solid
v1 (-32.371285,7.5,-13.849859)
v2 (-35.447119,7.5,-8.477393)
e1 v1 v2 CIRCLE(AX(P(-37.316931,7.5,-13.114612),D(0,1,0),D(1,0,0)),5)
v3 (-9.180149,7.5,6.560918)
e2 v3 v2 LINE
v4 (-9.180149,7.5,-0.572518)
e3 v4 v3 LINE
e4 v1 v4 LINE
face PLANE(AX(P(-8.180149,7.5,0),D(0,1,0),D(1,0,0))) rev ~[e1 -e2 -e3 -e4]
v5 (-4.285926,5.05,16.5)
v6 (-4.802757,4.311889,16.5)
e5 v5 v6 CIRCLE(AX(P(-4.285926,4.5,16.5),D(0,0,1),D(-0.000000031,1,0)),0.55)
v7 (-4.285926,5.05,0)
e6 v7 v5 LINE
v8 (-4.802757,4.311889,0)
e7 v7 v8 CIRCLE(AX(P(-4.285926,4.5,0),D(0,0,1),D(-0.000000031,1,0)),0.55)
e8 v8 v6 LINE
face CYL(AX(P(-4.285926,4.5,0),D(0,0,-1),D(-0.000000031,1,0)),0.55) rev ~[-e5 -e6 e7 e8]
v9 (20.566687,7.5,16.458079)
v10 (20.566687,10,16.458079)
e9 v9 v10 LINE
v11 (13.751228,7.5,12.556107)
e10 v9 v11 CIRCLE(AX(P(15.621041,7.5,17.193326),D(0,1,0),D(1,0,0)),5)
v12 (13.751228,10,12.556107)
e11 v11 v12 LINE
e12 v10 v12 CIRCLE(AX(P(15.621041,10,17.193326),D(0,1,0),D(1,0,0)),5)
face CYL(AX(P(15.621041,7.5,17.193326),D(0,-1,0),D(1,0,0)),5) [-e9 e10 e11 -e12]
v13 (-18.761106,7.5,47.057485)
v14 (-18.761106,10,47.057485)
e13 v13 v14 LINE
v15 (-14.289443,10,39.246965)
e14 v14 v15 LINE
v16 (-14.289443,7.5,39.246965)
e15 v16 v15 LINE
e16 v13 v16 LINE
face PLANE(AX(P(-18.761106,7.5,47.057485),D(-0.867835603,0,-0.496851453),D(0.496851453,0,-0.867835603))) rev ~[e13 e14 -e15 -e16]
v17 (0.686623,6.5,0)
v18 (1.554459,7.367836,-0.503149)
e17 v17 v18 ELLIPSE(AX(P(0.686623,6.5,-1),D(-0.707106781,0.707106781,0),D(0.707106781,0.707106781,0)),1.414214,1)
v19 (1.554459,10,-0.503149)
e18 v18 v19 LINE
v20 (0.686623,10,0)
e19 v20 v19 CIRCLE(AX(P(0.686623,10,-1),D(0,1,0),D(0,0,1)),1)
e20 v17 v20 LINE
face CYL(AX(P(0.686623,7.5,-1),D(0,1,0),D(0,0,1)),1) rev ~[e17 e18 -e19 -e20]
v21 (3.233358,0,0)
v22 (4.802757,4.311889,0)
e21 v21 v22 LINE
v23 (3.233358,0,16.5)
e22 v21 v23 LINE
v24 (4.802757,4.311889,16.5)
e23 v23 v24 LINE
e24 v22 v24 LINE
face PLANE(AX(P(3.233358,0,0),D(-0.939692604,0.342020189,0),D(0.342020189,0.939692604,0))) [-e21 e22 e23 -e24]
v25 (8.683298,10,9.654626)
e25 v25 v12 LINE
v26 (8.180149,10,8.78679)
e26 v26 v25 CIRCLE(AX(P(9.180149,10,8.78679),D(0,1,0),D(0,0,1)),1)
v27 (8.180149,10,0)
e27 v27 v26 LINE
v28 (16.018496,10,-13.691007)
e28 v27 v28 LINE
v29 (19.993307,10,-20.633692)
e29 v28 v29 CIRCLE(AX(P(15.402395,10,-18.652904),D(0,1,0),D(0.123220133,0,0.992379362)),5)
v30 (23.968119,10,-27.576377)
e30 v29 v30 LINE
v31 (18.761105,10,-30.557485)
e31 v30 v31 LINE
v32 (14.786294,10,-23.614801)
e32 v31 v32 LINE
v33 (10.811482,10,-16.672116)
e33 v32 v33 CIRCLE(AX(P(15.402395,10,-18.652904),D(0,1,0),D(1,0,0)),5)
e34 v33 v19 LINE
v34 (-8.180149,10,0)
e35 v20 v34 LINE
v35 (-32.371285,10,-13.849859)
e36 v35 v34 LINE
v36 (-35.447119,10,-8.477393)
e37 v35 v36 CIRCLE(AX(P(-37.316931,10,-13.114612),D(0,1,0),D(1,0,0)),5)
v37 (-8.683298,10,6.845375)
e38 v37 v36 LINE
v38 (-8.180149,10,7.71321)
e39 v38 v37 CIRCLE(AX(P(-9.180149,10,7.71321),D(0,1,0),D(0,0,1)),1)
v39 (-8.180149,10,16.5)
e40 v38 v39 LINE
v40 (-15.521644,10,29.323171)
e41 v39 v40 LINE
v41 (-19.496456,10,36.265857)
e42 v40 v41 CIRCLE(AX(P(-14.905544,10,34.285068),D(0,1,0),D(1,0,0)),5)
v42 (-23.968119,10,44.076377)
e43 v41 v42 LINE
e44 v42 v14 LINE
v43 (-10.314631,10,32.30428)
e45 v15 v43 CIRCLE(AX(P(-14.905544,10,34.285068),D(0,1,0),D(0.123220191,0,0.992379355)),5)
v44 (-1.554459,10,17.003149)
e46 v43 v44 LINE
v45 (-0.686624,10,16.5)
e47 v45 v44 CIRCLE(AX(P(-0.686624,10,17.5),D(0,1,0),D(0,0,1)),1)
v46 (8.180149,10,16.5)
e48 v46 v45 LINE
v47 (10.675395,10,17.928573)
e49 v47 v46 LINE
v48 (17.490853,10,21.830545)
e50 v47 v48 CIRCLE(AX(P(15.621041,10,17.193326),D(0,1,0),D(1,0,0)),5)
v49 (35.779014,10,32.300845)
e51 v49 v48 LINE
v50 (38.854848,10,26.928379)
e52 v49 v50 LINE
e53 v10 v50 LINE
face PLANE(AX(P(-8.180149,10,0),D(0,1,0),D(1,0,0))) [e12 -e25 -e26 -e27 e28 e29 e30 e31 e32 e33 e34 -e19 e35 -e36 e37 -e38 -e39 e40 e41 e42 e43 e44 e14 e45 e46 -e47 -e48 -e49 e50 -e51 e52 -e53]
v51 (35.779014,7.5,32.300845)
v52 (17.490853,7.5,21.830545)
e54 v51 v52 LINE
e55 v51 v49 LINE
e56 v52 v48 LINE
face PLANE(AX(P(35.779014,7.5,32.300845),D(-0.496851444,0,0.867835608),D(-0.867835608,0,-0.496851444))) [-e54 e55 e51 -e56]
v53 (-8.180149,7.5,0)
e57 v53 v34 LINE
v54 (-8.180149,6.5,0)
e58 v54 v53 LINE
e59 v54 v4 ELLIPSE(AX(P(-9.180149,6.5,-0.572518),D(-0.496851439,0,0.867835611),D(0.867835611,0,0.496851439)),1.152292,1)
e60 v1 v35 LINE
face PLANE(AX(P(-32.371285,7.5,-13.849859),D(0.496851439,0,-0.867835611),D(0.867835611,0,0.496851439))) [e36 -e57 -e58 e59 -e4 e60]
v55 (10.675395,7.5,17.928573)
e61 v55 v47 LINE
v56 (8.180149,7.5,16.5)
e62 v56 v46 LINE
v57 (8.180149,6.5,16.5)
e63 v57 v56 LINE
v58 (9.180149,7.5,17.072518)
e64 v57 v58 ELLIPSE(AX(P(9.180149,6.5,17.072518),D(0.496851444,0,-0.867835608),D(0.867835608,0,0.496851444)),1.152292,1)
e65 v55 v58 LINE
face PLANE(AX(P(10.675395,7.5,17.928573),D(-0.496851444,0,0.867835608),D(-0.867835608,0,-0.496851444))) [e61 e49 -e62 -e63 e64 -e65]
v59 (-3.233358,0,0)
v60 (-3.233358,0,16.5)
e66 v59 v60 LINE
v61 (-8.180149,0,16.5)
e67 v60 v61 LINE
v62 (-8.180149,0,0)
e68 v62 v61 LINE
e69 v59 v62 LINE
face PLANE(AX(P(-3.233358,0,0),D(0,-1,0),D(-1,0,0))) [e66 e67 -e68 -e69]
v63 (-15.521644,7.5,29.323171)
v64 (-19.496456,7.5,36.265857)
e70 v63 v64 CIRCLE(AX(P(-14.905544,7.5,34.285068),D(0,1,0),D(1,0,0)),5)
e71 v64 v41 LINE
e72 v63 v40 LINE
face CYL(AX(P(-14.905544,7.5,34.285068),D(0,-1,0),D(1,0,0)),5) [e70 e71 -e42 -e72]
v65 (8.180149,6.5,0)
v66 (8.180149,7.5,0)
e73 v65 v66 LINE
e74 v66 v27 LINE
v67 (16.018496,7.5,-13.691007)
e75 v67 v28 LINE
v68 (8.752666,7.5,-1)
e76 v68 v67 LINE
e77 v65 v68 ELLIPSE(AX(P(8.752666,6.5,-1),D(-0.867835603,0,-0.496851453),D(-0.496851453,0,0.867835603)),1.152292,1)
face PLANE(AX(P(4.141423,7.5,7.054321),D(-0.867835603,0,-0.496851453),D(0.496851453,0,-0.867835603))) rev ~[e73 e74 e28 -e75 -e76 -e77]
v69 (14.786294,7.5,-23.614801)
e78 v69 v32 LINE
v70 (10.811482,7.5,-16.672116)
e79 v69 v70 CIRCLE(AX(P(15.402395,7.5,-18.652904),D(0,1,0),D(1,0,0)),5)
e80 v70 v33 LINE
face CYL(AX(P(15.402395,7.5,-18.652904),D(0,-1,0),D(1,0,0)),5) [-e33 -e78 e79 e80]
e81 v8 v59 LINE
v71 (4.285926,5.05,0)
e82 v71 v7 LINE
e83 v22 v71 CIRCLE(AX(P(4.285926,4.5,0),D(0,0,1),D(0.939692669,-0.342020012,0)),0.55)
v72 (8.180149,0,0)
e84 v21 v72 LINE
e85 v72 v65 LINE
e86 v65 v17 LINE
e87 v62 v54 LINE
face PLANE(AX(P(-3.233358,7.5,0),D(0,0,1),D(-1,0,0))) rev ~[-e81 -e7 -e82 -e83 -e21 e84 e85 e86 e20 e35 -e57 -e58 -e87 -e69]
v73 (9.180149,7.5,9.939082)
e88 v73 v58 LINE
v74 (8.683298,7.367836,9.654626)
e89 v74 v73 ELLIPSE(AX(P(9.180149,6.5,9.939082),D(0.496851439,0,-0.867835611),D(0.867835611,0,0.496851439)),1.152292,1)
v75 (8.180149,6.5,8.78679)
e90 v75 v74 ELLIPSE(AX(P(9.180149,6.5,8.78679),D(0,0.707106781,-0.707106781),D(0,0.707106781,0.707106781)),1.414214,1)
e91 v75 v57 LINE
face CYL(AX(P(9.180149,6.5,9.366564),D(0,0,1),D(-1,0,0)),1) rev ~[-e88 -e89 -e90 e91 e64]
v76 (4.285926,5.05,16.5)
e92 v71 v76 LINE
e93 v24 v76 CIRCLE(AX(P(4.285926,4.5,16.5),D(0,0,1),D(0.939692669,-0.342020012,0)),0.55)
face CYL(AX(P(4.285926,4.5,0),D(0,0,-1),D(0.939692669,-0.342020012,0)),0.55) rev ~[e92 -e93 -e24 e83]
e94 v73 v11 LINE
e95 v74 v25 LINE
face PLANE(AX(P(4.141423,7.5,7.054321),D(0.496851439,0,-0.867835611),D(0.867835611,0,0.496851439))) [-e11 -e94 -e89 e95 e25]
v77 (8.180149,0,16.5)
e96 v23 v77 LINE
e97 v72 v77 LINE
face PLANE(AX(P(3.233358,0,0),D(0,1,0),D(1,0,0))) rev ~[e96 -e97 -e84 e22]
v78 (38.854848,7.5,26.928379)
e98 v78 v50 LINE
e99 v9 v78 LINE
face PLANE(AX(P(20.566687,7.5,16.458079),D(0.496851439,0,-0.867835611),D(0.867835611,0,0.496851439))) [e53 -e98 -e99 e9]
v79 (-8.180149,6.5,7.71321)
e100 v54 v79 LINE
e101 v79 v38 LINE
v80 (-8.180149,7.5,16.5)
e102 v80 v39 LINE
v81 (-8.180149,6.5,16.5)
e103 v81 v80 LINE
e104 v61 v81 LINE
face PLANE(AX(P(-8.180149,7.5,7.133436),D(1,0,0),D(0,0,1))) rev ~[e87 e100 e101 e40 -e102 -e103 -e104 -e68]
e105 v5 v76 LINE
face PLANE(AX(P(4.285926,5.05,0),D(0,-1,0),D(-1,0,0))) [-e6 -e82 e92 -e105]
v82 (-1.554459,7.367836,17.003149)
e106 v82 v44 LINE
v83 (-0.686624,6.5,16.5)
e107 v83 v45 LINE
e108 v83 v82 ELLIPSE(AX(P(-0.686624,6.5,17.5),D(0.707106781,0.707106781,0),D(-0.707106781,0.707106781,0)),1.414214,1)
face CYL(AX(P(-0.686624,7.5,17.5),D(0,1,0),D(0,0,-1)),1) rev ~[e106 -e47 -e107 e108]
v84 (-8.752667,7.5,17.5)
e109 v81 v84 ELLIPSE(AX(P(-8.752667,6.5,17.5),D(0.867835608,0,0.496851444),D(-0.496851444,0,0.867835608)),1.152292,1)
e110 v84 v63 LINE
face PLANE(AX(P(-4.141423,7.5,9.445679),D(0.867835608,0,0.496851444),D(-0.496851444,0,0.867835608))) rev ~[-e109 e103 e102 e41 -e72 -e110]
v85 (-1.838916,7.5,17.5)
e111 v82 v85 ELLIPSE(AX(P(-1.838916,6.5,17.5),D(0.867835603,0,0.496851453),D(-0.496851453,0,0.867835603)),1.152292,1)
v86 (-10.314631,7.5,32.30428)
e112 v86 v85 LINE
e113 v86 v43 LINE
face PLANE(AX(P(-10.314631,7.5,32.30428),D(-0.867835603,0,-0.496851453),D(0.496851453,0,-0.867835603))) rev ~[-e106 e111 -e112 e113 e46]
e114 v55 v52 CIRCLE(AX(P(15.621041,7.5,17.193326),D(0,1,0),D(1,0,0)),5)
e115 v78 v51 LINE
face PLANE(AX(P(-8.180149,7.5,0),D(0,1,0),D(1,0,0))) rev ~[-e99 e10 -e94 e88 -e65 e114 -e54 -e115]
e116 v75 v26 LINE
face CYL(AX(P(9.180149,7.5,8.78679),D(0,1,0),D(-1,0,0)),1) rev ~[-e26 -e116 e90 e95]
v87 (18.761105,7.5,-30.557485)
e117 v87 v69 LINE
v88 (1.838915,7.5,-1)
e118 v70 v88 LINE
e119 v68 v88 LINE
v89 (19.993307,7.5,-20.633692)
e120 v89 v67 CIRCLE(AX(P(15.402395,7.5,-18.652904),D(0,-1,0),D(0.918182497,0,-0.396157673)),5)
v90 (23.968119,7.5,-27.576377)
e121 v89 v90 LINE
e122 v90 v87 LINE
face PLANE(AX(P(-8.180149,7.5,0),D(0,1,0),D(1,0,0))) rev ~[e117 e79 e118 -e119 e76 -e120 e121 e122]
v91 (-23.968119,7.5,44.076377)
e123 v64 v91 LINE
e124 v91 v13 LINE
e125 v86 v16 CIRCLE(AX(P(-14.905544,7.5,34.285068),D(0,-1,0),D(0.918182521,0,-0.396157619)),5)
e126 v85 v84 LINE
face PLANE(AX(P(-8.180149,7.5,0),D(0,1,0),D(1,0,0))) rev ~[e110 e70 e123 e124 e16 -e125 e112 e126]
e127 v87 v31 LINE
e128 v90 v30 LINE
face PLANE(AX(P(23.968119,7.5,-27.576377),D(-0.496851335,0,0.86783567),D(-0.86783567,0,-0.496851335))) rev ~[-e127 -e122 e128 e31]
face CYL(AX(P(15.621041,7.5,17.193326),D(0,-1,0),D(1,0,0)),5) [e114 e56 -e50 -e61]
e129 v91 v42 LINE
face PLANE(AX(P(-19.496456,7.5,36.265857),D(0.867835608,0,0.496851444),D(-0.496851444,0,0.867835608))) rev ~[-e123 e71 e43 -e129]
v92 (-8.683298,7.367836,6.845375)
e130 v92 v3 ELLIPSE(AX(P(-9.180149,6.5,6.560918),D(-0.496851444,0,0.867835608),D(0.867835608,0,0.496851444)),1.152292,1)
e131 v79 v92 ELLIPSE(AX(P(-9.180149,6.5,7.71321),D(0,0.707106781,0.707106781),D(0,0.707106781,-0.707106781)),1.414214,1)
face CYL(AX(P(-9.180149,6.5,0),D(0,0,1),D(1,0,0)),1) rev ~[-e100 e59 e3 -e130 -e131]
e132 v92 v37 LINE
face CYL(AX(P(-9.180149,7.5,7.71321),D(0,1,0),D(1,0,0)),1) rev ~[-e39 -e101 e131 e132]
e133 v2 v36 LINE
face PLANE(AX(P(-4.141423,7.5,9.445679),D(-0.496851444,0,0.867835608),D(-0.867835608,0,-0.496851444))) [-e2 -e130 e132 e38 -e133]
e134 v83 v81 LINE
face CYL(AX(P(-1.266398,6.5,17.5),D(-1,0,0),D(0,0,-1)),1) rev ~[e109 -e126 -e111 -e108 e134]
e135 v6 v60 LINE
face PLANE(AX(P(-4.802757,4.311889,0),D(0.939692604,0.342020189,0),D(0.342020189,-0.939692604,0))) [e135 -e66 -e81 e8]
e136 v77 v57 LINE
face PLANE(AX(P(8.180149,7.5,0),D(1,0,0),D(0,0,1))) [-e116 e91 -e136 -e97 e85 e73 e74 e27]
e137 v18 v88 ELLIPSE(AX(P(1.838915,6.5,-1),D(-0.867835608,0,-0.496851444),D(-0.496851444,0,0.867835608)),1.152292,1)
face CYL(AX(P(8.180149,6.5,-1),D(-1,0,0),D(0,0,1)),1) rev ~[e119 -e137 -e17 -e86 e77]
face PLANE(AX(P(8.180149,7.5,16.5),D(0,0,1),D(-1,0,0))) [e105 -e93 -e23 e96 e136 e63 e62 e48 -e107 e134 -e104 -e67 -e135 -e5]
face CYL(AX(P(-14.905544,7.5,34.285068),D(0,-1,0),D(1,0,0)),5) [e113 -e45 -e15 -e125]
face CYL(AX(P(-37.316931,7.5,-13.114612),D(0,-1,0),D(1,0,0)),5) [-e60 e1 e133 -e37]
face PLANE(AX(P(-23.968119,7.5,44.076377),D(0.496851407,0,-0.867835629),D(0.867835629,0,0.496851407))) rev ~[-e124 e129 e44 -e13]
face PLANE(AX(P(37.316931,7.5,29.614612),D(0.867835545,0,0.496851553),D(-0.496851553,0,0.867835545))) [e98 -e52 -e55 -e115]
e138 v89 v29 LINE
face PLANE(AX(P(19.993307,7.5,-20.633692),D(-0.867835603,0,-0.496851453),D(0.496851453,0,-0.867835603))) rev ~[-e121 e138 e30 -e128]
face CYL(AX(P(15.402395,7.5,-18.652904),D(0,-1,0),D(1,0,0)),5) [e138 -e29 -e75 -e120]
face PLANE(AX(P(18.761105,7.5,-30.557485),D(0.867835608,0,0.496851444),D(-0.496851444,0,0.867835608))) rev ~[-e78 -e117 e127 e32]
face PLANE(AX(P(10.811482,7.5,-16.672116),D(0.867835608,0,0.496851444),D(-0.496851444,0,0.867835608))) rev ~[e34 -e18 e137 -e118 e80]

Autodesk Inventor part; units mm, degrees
ref_plane "YZ Plane" through (0, 0, 0) normal (1, 0, 0) x (0, 1, 0)
ref_plane "XZ Plane" through (0, 0, 0) normal (0, 1, 0) x (-1, 0, 0)
ref_plane "XY Plane" through (0, 0, 0) normal (0, 0, 1) x (1, 0, 0)
sketch "Sketch1" plane through (0, 0, 0) normal (0, 0, 1) x (1, 0, 0)
  line L0 (0, 5) -> (4.285926, 5)
  line L1 (4.755772, 4.32899) -> (3.180149, 0)
  line L2 (3.180149, 0) -> (0, 0)
  line L3 (0, 5) -> (-4.285926, 5)
  line L4 (-4.755772, 4.32899) -> (-3.180149, 0)
  line L5 (-3.180149, 0) -> (0, 0)
  arc A0 (-4.285926, 5) -> (-4.755772, 4.32899) centre (-4.285926, 4.5) ccw
  arc A1 (4.755772, 4.32899) -> (4.285926, 5) centre (4.285926, 4.5) ccw
  line L6 (4.285926, 5.05) -> (0, 5.05)
  line L7 (0, 5.05) -> (-4.285926, 5.05)
  arc A2 (-4.285926, 5.05) -> (-4.802757, 4.311889) centre (-4.285926, 4.5) ccw
  line L8 (-4.802757, 4.311889) -> (-3.215159, -0.05)
  line L9 (-3.215159, -0.05) -> (0, -0.05)
  line L10 (0, -0.05) -> (3.215159, -0.05)
  line L11 (3.215159, -0.05) -> (4.802757, 4.311889)
  arc A3 (4.802757, 4.311889) -> (4.285926, 5.05) centre (4.285926, 4.5) ccw
  line L12 (-3.180149, 0) -> (-8.180149, 0)
  line L13 (-8.180149, 0) -> (-8.180149, 7.5)
  line L14 (3.180149, 0) -> (8.180149, 0)
  line L15 (8.180149, 0) -> (8.180149, 7.5)
  line L16 (8.180149, 7.5) -> (-8.180149, 7.5)
  point P0 (5, 5)
  point P1 (-5, 5)
  point P2 (3.233358, 0)
  point P3 (-3.233358, 0)
  dimension "d0" = 5
  dimension "d1" = 5
  dimension "d2" = 70
  dimension "d3" = 5
  dimension "d4" = 70
  dimension "d5" = 0.5
  dimension "d6" = 0.05
  dimension "d7" = 5
  dimension "d8" = 7.5
  dimension "d9" = 5
extrude "Extrusion1" add sketch "Sketch1" along normal blind 16.5 contours L11 A3 L6 L7 A2 L8 L12 L13 L16 L15 L14
sketch "Sketch2" plane through (-8.180149, 7.5, 0) normal (0, 1, 0) x (1, 0, 0)
  line L0 (-10.580957, -47.057485) -> (32.148268, 27.576377)
  line L1 (32.148268, 27.576377) -> (26.941254, 30.557485)
  line L2 (26.941254, 30.557485) -> (-15.78797, -44.076377)
  line L3 (-15.78797, -44.076377) -> (-10.580957, -47.057485)
  line L4 (-10.580957, -47.057485) -> (26.941254, 30.557485) construction
  line L5 (32.148268, 27.576377) -> (-15.78797, -44.076377) construction
  circle A0 centre (-6.725395, -34.285068) radius 5
  circle A1 centre (23.582544, 18.652904) radius 5
  line L6 (-13.184463, -45.566931) -> (29.544761, 29.066931) construction
  line L7 (16.360298, -16.5) -> (0, -16.5) construction
  line L8 (0, 0) -> (16.360298, -16.5) construction
  line L9 (16.360298, 0) -> (0, 0) construction
  line L10 (16.360298, -16.5) -> (16.360298, 0) construction
  line L11 (16.360298, 0) -> (0.368439, -15.856459) construction
  line L12 (-30.674699, 10.428379) -> (-27.598866, 15.800845)
  line L13 (-27.598866, 15.800845) -> (47.034997, -26.928379)
  line L14 (47.034997, -26.928379) -> (43.959163, -32.300845)
  line L15 (43.959163, -32.300845) -> (-30.674699, 10.428379)
  line L16 (-30.674699, 10.428379) -> (47.034997, -26.928379) construction
  line L17 (-27.598866, 15.800845) -> (43.959163, -32.300845) construction
  circle A2 centre (-29.136782, 13.114612) radius 5
  circle A3 centre (23.80119, -17.193326) radius 5
  line L18 (-29.136782, 13.114612) -> (45.49708, -29.614612)
  point P0 (8.180149, 0)
  point P1 (8.180149, -8.25)
  point P2 (8.180149, -8.25)
  point P3 (-24.191137, 13.849859)
  point P4 (-27.26697, 8.477393)
  point P5 (4.038725, -9.445679)
  point P6 (-7.341496, -29.323171)
  point P7 (-11.316307, -36.265856)
  point P8 (-6.109293, -39.246965)
  point P9 (-2.134482, -32.30428)
  point P10 (9.245739, -12.426788)
  point P11 (18.855544, -17.928573)
  point P12 (25.671002, -21.830545)
  point P13 (28.746835, -16.458079)
  point P14 (21.931377, -12.556107)
  point P15 (12.321572, -7.054321)
  point P16 (24.198645, 13.691007)
  point P17 (28.173456, 20.633692)
  point P18 (22.966443, 23.614801)
  point P19 (18.991631, 16.672116)
  point P20 (7.114559, -4.073212)
  dimension "d12" = 86
  dimension "d13" = 6
  dimension "d14" = 10
  dimension "d15" = 10
  dimension "d16" = 61
  dimension "d17" = 12
  dimension "d19" = 86
  dimension "d20" = 10
  dimension "d21" = 10
  dimension "d22" = 61
  dimension "d26" = 90
extrude "Extrusion2" add sketch "Sketch2" along normal blind 2.5
sketch "Sketch3" plane through (-8.180149, 7.5, 0) normal (0, 1, 0) x (1, 0, 0)
  line L0 (0, -7.133436) -> (0, -16.5)
  line L1 (9.446546, 0) -> (0, 0)
  line L2 (16.360298, 0) -> (16.360298, -9.366564)
  line L3 (16.360298, -16.5) -> (6.913752, -16.5)
  line L4 (0, 0) -> (4.946791, 0)
  line L5 (0, 0) -> (16.360298, 0)
  line L6 (16.360298, 0) -> (16.360298, -16.5)
  line L7 (16.360298, -16.5) -> (0, -16.5)
  line L8 (0, -16.5) -> (0, 0)
  point P0 (8.180149, 0)
  point P1 (0, -16.418433)
  point P2 (16.360298, -0.081567)
  point P3 (0, -16.418433)
  point P4 (16.360298, -0.081567)
extrude "Extrusion3" add sketch "Sketch3" along normal blind 2.5
fillet "Fillet1" radius 1 8 edges at (4.7233, 7.5, 0) (1.2664, 8.75, 0) (-8.1801, 7.5, 3.5667) (-8.1801, 8.75, 7.1334) (-4.7233, 7.5, 16.5) (-1.2664, 8.75, 16.5) (8.1801, 7.5, 12.9333) (8.1801, 8.75, 9.3666)
properties part number "female1"
